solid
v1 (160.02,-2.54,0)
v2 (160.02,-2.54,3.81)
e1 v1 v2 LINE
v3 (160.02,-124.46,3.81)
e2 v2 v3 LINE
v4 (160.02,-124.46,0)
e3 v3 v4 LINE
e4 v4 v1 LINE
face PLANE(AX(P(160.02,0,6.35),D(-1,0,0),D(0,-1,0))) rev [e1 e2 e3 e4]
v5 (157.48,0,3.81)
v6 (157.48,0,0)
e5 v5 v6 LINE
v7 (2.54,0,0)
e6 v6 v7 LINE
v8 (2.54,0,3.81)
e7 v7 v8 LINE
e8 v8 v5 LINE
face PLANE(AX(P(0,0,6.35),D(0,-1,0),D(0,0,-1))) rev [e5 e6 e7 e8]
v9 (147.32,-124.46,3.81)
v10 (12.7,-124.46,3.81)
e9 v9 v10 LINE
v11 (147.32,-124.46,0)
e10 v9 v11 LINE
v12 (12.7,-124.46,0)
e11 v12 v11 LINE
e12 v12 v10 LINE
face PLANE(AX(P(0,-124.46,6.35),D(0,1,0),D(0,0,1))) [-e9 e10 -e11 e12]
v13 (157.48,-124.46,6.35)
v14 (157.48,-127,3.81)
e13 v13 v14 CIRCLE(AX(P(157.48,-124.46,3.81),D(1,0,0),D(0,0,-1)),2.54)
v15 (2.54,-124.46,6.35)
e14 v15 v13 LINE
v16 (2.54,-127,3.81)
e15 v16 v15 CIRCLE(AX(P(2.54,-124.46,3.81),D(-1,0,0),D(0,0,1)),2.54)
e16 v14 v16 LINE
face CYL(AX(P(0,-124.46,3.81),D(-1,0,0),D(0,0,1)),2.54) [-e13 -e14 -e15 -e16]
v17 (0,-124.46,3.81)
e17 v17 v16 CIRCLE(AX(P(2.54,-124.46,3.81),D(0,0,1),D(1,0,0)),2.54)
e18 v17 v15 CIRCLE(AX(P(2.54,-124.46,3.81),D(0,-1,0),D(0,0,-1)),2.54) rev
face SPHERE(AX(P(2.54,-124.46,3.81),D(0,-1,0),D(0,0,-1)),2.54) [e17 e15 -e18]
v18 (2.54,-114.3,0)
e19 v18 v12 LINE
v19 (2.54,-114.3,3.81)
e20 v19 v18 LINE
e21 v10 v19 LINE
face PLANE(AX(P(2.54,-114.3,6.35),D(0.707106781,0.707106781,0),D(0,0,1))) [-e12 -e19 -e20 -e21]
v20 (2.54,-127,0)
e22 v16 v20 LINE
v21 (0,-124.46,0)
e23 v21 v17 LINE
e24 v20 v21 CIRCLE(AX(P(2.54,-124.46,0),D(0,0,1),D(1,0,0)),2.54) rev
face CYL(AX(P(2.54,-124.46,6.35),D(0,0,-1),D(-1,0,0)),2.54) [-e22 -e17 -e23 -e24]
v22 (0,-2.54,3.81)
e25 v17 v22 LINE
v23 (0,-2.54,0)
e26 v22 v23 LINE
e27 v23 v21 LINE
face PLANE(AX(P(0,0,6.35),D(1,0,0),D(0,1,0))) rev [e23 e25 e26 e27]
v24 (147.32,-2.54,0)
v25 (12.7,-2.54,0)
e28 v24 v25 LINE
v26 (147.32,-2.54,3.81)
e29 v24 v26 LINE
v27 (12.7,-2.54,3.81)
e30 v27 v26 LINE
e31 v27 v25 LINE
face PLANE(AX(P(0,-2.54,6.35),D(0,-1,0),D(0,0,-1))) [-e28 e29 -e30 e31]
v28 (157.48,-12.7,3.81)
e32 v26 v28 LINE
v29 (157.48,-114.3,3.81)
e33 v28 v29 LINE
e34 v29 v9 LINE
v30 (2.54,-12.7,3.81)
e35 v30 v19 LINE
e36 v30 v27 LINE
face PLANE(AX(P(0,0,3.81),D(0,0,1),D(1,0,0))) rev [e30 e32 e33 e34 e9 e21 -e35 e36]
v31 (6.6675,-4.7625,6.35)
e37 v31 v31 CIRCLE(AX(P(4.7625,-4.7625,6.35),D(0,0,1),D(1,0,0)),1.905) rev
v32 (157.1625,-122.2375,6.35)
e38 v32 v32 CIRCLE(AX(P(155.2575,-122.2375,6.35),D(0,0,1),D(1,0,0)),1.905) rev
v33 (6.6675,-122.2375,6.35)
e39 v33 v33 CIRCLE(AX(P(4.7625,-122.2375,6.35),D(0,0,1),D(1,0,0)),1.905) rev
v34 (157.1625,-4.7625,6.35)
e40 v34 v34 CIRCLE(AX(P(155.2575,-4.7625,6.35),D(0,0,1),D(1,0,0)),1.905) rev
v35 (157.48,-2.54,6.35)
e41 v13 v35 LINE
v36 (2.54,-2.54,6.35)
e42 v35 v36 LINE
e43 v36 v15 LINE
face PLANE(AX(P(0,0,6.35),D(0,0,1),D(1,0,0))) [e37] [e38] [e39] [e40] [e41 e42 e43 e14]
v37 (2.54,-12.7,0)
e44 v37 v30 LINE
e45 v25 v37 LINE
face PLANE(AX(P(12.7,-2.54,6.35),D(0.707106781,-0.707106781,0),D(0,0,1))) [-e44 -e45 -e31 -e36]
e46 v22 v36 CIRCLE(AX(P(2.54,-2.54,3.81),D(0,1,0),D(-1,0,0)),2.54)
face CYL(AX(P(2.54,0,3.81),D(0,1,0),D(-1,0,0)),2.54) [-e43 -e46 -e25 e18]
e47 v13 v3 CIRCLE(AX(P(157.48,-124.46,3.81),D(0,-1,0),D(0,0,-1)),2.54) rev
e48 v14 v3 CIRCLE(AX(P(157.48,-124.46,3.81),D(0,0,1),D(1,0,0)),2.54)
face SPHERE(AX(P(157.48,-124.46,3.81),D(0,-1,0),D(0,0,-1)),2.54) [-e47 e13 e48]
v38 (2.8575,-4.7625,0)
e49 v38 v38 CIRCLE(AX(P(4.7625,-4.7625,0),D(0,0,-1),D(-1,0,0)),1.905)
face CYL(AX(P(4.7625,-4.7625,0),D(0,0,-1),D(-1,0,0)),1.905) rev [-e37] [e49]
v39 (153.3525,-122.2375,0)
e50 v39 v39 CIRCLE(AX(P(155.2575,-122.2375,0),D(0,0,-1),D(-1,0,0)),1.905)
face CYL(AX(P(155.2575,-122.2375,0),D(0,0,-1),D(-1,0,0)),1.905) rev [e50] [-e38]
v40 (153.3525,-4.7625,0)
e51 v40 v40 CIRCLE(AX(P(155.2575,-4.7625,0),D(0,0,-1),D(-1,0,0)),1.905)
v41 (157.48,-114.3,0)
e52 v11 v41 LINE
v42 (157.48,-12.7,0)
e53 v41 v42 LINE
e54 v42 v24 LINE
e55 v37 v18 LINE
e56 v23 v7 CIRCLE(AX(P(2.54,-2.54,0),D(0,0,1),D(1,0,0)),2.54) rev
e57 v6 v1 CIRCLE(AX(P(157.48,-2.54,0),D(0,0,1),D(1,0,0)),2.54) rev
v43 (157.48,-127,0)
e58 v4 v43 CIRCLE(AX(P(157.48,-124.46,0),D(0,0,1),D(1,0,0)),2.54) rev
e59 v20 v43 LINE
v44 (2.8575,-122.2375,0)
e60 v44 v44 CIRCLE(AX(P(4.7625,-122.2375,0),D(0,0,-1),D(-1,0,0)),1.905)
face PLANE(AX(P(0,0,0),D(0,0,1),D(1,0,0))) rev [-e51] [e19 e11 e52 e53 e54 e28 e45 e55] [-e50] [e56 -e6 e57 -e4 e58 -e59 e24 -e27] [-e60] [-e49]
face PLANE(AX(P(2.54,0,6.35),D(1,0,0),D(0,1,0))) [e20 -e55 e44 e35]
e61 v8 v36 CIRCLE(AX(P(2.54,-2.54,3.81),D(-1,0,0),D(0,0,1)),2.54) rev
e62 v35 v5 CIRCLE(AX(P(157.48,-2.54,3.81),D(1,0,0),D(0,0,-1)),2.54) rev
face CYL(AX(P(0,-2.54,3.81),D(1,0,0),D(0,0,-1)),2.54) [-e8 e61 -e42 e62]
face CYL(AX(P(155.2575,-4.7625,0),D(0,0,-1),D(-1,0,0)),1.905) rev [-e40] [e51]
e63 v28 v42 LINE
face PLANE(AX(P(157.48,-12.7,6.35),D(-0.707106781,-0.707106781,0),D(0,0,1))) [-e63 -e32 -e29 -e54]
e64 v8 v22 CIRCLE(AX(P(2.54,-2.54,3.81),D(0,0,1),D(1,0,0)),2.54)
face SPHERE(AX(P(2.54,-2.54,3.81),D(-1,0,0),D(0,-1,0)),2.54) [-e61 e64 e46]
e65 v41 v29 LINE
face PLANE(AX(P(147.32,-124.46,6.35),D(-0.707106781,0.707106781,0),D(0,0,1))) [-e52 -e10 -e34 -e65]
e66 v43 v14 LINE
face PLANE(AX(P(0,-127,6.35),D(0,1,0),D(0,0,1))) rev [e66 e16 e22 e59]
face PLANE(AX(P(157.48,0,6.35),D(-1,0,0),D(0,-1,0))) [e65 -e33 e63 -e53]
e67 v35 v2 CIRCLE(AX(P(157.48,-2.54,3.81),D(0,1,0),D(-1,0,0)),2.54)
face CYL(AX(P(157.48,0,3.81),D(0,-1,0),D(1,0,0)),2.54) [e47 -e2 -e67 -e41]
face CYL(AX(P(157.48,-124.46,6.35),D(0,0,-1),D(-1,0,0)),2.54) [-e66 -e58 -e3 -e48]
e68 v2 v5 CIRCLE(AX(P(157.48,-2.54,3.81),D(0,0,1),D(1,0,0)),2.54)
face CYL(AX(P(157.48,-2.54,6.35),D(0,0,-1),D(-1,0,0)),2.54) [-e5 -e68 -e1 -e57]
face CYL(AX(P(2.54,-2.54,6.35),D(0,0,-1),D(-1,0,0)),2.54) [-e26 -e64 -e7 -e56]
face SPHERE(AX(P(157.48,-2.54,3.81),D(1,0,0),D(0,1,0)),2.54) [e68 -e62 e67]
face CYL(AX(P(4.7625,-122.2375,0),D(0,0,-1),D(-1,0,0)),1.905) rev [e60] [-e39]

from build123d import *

# Parameters (mm, degrees)
SKETCH1_W                        = 160.02
SKETCH1_H                        = 127
BOSS_EXTRUDE1_DEPTH              = 6.35
FILLET1_R                        = 2.54
SHELL1_START                     = 2.54
SHELL1_OUTLINE_W                 = 121.92
SHELL1_OUTLINE_H                 = 3.81
SHELL1_DEPTH                     = 154.94
CHAMFER1_SIZE                    = 10.16
F_9_64_0_15_DIAMETER_HOLE1_D     = 3.81
F_9_64_0_15_DIAMETER_HOLE1_DEPTH = 6.35
F_9_64_0_15_DIAMETER_HOLE1_TIP   = 1.144639479


# Read off the part's stored shape, not the designer's step: Shell1
with BuildPart() as part:
    # Sketch1 → Boss-Extrude1 (new body)
    with BuildSketch(Plane.XY):
        with Locations((80.01, -63.5)):
            Rectangle(SKETCH1_W, SKETCH1_H)
    extrude(amount=BOSS_EXTRUDE1_DEPTH)

    # Fillet1
    fillet1_edges = [part.edges().sort_by_distance(p)[0] for p in [
        (160.02, -63.5, 6.35),
        (80.01, 0, 6.35),
        (0, -63.5, 6.35),
        (0, 0, 3.175),
        (160.02, 0, 3.175),
        (160.02, -127, 3.175),
        (0, -127, 3.175),
        (80.01, -127, 6.35),
    ]]
    fillet(fillet1_edges, radius=FILLET1_R)

    # Shell1 outline → Shell1 (cut)
    with BuildSketch(Plane.YZ.offset(SHELL1_START)):
        with Locations((-63.5, 1.905)):
            Rectangle(SHELL1_OUTLINE_W, SHELL1_OUTLINE_H)
    extrude(amount=SHELL1_DEPTH, mode=Mode.SUBTRACT)

    # Chamfer1
    chamfer1_edges = [part.edges().sort_by_distance(p)[0] for p in [
        (2.54, -2.54, 1.905),
        (2.54, -124.46, 1.905),
        (157.48, -124.46, 1.905),
        (157.48, -2.54, 1.905),
    ]]
    chamfer(chamfer1_edges, length=CHAMFER1_SIZE)

    # 9/64 (0.15) Diameter Hole1
    with Locations(Plane(origin=(0, 0, 0), x_dir=(-1, 0, 0), z_dir=(0, 0, -1))):
        with Locations((-155.2575, -4.7625), (-4.7625, -4.7625), (-4.7625, -122.2375), (-155.2575, -122.2375)):
            Hole(F_9_64_0_15_DIAMETER_HOLE1_D / 2, depth=F_9_64_0_15_DIAMETER_HOLE1_DEPTH)
            with Locations((0, 0, -(F_9_64_0_15_DIAMETER_HOLE1_DEPTH + F_9_64_0_15_DIAMETER_HOLE1_TIP / 2))):  # 118° drill point
                Cone(0, F_9_64_0_15_DIAMETER_HOLE1_D / 2, F_9_64_0_15_DIAMETER_HOLE1_TIP, mode=Mode.SUBTRACT)


solid = part.part
